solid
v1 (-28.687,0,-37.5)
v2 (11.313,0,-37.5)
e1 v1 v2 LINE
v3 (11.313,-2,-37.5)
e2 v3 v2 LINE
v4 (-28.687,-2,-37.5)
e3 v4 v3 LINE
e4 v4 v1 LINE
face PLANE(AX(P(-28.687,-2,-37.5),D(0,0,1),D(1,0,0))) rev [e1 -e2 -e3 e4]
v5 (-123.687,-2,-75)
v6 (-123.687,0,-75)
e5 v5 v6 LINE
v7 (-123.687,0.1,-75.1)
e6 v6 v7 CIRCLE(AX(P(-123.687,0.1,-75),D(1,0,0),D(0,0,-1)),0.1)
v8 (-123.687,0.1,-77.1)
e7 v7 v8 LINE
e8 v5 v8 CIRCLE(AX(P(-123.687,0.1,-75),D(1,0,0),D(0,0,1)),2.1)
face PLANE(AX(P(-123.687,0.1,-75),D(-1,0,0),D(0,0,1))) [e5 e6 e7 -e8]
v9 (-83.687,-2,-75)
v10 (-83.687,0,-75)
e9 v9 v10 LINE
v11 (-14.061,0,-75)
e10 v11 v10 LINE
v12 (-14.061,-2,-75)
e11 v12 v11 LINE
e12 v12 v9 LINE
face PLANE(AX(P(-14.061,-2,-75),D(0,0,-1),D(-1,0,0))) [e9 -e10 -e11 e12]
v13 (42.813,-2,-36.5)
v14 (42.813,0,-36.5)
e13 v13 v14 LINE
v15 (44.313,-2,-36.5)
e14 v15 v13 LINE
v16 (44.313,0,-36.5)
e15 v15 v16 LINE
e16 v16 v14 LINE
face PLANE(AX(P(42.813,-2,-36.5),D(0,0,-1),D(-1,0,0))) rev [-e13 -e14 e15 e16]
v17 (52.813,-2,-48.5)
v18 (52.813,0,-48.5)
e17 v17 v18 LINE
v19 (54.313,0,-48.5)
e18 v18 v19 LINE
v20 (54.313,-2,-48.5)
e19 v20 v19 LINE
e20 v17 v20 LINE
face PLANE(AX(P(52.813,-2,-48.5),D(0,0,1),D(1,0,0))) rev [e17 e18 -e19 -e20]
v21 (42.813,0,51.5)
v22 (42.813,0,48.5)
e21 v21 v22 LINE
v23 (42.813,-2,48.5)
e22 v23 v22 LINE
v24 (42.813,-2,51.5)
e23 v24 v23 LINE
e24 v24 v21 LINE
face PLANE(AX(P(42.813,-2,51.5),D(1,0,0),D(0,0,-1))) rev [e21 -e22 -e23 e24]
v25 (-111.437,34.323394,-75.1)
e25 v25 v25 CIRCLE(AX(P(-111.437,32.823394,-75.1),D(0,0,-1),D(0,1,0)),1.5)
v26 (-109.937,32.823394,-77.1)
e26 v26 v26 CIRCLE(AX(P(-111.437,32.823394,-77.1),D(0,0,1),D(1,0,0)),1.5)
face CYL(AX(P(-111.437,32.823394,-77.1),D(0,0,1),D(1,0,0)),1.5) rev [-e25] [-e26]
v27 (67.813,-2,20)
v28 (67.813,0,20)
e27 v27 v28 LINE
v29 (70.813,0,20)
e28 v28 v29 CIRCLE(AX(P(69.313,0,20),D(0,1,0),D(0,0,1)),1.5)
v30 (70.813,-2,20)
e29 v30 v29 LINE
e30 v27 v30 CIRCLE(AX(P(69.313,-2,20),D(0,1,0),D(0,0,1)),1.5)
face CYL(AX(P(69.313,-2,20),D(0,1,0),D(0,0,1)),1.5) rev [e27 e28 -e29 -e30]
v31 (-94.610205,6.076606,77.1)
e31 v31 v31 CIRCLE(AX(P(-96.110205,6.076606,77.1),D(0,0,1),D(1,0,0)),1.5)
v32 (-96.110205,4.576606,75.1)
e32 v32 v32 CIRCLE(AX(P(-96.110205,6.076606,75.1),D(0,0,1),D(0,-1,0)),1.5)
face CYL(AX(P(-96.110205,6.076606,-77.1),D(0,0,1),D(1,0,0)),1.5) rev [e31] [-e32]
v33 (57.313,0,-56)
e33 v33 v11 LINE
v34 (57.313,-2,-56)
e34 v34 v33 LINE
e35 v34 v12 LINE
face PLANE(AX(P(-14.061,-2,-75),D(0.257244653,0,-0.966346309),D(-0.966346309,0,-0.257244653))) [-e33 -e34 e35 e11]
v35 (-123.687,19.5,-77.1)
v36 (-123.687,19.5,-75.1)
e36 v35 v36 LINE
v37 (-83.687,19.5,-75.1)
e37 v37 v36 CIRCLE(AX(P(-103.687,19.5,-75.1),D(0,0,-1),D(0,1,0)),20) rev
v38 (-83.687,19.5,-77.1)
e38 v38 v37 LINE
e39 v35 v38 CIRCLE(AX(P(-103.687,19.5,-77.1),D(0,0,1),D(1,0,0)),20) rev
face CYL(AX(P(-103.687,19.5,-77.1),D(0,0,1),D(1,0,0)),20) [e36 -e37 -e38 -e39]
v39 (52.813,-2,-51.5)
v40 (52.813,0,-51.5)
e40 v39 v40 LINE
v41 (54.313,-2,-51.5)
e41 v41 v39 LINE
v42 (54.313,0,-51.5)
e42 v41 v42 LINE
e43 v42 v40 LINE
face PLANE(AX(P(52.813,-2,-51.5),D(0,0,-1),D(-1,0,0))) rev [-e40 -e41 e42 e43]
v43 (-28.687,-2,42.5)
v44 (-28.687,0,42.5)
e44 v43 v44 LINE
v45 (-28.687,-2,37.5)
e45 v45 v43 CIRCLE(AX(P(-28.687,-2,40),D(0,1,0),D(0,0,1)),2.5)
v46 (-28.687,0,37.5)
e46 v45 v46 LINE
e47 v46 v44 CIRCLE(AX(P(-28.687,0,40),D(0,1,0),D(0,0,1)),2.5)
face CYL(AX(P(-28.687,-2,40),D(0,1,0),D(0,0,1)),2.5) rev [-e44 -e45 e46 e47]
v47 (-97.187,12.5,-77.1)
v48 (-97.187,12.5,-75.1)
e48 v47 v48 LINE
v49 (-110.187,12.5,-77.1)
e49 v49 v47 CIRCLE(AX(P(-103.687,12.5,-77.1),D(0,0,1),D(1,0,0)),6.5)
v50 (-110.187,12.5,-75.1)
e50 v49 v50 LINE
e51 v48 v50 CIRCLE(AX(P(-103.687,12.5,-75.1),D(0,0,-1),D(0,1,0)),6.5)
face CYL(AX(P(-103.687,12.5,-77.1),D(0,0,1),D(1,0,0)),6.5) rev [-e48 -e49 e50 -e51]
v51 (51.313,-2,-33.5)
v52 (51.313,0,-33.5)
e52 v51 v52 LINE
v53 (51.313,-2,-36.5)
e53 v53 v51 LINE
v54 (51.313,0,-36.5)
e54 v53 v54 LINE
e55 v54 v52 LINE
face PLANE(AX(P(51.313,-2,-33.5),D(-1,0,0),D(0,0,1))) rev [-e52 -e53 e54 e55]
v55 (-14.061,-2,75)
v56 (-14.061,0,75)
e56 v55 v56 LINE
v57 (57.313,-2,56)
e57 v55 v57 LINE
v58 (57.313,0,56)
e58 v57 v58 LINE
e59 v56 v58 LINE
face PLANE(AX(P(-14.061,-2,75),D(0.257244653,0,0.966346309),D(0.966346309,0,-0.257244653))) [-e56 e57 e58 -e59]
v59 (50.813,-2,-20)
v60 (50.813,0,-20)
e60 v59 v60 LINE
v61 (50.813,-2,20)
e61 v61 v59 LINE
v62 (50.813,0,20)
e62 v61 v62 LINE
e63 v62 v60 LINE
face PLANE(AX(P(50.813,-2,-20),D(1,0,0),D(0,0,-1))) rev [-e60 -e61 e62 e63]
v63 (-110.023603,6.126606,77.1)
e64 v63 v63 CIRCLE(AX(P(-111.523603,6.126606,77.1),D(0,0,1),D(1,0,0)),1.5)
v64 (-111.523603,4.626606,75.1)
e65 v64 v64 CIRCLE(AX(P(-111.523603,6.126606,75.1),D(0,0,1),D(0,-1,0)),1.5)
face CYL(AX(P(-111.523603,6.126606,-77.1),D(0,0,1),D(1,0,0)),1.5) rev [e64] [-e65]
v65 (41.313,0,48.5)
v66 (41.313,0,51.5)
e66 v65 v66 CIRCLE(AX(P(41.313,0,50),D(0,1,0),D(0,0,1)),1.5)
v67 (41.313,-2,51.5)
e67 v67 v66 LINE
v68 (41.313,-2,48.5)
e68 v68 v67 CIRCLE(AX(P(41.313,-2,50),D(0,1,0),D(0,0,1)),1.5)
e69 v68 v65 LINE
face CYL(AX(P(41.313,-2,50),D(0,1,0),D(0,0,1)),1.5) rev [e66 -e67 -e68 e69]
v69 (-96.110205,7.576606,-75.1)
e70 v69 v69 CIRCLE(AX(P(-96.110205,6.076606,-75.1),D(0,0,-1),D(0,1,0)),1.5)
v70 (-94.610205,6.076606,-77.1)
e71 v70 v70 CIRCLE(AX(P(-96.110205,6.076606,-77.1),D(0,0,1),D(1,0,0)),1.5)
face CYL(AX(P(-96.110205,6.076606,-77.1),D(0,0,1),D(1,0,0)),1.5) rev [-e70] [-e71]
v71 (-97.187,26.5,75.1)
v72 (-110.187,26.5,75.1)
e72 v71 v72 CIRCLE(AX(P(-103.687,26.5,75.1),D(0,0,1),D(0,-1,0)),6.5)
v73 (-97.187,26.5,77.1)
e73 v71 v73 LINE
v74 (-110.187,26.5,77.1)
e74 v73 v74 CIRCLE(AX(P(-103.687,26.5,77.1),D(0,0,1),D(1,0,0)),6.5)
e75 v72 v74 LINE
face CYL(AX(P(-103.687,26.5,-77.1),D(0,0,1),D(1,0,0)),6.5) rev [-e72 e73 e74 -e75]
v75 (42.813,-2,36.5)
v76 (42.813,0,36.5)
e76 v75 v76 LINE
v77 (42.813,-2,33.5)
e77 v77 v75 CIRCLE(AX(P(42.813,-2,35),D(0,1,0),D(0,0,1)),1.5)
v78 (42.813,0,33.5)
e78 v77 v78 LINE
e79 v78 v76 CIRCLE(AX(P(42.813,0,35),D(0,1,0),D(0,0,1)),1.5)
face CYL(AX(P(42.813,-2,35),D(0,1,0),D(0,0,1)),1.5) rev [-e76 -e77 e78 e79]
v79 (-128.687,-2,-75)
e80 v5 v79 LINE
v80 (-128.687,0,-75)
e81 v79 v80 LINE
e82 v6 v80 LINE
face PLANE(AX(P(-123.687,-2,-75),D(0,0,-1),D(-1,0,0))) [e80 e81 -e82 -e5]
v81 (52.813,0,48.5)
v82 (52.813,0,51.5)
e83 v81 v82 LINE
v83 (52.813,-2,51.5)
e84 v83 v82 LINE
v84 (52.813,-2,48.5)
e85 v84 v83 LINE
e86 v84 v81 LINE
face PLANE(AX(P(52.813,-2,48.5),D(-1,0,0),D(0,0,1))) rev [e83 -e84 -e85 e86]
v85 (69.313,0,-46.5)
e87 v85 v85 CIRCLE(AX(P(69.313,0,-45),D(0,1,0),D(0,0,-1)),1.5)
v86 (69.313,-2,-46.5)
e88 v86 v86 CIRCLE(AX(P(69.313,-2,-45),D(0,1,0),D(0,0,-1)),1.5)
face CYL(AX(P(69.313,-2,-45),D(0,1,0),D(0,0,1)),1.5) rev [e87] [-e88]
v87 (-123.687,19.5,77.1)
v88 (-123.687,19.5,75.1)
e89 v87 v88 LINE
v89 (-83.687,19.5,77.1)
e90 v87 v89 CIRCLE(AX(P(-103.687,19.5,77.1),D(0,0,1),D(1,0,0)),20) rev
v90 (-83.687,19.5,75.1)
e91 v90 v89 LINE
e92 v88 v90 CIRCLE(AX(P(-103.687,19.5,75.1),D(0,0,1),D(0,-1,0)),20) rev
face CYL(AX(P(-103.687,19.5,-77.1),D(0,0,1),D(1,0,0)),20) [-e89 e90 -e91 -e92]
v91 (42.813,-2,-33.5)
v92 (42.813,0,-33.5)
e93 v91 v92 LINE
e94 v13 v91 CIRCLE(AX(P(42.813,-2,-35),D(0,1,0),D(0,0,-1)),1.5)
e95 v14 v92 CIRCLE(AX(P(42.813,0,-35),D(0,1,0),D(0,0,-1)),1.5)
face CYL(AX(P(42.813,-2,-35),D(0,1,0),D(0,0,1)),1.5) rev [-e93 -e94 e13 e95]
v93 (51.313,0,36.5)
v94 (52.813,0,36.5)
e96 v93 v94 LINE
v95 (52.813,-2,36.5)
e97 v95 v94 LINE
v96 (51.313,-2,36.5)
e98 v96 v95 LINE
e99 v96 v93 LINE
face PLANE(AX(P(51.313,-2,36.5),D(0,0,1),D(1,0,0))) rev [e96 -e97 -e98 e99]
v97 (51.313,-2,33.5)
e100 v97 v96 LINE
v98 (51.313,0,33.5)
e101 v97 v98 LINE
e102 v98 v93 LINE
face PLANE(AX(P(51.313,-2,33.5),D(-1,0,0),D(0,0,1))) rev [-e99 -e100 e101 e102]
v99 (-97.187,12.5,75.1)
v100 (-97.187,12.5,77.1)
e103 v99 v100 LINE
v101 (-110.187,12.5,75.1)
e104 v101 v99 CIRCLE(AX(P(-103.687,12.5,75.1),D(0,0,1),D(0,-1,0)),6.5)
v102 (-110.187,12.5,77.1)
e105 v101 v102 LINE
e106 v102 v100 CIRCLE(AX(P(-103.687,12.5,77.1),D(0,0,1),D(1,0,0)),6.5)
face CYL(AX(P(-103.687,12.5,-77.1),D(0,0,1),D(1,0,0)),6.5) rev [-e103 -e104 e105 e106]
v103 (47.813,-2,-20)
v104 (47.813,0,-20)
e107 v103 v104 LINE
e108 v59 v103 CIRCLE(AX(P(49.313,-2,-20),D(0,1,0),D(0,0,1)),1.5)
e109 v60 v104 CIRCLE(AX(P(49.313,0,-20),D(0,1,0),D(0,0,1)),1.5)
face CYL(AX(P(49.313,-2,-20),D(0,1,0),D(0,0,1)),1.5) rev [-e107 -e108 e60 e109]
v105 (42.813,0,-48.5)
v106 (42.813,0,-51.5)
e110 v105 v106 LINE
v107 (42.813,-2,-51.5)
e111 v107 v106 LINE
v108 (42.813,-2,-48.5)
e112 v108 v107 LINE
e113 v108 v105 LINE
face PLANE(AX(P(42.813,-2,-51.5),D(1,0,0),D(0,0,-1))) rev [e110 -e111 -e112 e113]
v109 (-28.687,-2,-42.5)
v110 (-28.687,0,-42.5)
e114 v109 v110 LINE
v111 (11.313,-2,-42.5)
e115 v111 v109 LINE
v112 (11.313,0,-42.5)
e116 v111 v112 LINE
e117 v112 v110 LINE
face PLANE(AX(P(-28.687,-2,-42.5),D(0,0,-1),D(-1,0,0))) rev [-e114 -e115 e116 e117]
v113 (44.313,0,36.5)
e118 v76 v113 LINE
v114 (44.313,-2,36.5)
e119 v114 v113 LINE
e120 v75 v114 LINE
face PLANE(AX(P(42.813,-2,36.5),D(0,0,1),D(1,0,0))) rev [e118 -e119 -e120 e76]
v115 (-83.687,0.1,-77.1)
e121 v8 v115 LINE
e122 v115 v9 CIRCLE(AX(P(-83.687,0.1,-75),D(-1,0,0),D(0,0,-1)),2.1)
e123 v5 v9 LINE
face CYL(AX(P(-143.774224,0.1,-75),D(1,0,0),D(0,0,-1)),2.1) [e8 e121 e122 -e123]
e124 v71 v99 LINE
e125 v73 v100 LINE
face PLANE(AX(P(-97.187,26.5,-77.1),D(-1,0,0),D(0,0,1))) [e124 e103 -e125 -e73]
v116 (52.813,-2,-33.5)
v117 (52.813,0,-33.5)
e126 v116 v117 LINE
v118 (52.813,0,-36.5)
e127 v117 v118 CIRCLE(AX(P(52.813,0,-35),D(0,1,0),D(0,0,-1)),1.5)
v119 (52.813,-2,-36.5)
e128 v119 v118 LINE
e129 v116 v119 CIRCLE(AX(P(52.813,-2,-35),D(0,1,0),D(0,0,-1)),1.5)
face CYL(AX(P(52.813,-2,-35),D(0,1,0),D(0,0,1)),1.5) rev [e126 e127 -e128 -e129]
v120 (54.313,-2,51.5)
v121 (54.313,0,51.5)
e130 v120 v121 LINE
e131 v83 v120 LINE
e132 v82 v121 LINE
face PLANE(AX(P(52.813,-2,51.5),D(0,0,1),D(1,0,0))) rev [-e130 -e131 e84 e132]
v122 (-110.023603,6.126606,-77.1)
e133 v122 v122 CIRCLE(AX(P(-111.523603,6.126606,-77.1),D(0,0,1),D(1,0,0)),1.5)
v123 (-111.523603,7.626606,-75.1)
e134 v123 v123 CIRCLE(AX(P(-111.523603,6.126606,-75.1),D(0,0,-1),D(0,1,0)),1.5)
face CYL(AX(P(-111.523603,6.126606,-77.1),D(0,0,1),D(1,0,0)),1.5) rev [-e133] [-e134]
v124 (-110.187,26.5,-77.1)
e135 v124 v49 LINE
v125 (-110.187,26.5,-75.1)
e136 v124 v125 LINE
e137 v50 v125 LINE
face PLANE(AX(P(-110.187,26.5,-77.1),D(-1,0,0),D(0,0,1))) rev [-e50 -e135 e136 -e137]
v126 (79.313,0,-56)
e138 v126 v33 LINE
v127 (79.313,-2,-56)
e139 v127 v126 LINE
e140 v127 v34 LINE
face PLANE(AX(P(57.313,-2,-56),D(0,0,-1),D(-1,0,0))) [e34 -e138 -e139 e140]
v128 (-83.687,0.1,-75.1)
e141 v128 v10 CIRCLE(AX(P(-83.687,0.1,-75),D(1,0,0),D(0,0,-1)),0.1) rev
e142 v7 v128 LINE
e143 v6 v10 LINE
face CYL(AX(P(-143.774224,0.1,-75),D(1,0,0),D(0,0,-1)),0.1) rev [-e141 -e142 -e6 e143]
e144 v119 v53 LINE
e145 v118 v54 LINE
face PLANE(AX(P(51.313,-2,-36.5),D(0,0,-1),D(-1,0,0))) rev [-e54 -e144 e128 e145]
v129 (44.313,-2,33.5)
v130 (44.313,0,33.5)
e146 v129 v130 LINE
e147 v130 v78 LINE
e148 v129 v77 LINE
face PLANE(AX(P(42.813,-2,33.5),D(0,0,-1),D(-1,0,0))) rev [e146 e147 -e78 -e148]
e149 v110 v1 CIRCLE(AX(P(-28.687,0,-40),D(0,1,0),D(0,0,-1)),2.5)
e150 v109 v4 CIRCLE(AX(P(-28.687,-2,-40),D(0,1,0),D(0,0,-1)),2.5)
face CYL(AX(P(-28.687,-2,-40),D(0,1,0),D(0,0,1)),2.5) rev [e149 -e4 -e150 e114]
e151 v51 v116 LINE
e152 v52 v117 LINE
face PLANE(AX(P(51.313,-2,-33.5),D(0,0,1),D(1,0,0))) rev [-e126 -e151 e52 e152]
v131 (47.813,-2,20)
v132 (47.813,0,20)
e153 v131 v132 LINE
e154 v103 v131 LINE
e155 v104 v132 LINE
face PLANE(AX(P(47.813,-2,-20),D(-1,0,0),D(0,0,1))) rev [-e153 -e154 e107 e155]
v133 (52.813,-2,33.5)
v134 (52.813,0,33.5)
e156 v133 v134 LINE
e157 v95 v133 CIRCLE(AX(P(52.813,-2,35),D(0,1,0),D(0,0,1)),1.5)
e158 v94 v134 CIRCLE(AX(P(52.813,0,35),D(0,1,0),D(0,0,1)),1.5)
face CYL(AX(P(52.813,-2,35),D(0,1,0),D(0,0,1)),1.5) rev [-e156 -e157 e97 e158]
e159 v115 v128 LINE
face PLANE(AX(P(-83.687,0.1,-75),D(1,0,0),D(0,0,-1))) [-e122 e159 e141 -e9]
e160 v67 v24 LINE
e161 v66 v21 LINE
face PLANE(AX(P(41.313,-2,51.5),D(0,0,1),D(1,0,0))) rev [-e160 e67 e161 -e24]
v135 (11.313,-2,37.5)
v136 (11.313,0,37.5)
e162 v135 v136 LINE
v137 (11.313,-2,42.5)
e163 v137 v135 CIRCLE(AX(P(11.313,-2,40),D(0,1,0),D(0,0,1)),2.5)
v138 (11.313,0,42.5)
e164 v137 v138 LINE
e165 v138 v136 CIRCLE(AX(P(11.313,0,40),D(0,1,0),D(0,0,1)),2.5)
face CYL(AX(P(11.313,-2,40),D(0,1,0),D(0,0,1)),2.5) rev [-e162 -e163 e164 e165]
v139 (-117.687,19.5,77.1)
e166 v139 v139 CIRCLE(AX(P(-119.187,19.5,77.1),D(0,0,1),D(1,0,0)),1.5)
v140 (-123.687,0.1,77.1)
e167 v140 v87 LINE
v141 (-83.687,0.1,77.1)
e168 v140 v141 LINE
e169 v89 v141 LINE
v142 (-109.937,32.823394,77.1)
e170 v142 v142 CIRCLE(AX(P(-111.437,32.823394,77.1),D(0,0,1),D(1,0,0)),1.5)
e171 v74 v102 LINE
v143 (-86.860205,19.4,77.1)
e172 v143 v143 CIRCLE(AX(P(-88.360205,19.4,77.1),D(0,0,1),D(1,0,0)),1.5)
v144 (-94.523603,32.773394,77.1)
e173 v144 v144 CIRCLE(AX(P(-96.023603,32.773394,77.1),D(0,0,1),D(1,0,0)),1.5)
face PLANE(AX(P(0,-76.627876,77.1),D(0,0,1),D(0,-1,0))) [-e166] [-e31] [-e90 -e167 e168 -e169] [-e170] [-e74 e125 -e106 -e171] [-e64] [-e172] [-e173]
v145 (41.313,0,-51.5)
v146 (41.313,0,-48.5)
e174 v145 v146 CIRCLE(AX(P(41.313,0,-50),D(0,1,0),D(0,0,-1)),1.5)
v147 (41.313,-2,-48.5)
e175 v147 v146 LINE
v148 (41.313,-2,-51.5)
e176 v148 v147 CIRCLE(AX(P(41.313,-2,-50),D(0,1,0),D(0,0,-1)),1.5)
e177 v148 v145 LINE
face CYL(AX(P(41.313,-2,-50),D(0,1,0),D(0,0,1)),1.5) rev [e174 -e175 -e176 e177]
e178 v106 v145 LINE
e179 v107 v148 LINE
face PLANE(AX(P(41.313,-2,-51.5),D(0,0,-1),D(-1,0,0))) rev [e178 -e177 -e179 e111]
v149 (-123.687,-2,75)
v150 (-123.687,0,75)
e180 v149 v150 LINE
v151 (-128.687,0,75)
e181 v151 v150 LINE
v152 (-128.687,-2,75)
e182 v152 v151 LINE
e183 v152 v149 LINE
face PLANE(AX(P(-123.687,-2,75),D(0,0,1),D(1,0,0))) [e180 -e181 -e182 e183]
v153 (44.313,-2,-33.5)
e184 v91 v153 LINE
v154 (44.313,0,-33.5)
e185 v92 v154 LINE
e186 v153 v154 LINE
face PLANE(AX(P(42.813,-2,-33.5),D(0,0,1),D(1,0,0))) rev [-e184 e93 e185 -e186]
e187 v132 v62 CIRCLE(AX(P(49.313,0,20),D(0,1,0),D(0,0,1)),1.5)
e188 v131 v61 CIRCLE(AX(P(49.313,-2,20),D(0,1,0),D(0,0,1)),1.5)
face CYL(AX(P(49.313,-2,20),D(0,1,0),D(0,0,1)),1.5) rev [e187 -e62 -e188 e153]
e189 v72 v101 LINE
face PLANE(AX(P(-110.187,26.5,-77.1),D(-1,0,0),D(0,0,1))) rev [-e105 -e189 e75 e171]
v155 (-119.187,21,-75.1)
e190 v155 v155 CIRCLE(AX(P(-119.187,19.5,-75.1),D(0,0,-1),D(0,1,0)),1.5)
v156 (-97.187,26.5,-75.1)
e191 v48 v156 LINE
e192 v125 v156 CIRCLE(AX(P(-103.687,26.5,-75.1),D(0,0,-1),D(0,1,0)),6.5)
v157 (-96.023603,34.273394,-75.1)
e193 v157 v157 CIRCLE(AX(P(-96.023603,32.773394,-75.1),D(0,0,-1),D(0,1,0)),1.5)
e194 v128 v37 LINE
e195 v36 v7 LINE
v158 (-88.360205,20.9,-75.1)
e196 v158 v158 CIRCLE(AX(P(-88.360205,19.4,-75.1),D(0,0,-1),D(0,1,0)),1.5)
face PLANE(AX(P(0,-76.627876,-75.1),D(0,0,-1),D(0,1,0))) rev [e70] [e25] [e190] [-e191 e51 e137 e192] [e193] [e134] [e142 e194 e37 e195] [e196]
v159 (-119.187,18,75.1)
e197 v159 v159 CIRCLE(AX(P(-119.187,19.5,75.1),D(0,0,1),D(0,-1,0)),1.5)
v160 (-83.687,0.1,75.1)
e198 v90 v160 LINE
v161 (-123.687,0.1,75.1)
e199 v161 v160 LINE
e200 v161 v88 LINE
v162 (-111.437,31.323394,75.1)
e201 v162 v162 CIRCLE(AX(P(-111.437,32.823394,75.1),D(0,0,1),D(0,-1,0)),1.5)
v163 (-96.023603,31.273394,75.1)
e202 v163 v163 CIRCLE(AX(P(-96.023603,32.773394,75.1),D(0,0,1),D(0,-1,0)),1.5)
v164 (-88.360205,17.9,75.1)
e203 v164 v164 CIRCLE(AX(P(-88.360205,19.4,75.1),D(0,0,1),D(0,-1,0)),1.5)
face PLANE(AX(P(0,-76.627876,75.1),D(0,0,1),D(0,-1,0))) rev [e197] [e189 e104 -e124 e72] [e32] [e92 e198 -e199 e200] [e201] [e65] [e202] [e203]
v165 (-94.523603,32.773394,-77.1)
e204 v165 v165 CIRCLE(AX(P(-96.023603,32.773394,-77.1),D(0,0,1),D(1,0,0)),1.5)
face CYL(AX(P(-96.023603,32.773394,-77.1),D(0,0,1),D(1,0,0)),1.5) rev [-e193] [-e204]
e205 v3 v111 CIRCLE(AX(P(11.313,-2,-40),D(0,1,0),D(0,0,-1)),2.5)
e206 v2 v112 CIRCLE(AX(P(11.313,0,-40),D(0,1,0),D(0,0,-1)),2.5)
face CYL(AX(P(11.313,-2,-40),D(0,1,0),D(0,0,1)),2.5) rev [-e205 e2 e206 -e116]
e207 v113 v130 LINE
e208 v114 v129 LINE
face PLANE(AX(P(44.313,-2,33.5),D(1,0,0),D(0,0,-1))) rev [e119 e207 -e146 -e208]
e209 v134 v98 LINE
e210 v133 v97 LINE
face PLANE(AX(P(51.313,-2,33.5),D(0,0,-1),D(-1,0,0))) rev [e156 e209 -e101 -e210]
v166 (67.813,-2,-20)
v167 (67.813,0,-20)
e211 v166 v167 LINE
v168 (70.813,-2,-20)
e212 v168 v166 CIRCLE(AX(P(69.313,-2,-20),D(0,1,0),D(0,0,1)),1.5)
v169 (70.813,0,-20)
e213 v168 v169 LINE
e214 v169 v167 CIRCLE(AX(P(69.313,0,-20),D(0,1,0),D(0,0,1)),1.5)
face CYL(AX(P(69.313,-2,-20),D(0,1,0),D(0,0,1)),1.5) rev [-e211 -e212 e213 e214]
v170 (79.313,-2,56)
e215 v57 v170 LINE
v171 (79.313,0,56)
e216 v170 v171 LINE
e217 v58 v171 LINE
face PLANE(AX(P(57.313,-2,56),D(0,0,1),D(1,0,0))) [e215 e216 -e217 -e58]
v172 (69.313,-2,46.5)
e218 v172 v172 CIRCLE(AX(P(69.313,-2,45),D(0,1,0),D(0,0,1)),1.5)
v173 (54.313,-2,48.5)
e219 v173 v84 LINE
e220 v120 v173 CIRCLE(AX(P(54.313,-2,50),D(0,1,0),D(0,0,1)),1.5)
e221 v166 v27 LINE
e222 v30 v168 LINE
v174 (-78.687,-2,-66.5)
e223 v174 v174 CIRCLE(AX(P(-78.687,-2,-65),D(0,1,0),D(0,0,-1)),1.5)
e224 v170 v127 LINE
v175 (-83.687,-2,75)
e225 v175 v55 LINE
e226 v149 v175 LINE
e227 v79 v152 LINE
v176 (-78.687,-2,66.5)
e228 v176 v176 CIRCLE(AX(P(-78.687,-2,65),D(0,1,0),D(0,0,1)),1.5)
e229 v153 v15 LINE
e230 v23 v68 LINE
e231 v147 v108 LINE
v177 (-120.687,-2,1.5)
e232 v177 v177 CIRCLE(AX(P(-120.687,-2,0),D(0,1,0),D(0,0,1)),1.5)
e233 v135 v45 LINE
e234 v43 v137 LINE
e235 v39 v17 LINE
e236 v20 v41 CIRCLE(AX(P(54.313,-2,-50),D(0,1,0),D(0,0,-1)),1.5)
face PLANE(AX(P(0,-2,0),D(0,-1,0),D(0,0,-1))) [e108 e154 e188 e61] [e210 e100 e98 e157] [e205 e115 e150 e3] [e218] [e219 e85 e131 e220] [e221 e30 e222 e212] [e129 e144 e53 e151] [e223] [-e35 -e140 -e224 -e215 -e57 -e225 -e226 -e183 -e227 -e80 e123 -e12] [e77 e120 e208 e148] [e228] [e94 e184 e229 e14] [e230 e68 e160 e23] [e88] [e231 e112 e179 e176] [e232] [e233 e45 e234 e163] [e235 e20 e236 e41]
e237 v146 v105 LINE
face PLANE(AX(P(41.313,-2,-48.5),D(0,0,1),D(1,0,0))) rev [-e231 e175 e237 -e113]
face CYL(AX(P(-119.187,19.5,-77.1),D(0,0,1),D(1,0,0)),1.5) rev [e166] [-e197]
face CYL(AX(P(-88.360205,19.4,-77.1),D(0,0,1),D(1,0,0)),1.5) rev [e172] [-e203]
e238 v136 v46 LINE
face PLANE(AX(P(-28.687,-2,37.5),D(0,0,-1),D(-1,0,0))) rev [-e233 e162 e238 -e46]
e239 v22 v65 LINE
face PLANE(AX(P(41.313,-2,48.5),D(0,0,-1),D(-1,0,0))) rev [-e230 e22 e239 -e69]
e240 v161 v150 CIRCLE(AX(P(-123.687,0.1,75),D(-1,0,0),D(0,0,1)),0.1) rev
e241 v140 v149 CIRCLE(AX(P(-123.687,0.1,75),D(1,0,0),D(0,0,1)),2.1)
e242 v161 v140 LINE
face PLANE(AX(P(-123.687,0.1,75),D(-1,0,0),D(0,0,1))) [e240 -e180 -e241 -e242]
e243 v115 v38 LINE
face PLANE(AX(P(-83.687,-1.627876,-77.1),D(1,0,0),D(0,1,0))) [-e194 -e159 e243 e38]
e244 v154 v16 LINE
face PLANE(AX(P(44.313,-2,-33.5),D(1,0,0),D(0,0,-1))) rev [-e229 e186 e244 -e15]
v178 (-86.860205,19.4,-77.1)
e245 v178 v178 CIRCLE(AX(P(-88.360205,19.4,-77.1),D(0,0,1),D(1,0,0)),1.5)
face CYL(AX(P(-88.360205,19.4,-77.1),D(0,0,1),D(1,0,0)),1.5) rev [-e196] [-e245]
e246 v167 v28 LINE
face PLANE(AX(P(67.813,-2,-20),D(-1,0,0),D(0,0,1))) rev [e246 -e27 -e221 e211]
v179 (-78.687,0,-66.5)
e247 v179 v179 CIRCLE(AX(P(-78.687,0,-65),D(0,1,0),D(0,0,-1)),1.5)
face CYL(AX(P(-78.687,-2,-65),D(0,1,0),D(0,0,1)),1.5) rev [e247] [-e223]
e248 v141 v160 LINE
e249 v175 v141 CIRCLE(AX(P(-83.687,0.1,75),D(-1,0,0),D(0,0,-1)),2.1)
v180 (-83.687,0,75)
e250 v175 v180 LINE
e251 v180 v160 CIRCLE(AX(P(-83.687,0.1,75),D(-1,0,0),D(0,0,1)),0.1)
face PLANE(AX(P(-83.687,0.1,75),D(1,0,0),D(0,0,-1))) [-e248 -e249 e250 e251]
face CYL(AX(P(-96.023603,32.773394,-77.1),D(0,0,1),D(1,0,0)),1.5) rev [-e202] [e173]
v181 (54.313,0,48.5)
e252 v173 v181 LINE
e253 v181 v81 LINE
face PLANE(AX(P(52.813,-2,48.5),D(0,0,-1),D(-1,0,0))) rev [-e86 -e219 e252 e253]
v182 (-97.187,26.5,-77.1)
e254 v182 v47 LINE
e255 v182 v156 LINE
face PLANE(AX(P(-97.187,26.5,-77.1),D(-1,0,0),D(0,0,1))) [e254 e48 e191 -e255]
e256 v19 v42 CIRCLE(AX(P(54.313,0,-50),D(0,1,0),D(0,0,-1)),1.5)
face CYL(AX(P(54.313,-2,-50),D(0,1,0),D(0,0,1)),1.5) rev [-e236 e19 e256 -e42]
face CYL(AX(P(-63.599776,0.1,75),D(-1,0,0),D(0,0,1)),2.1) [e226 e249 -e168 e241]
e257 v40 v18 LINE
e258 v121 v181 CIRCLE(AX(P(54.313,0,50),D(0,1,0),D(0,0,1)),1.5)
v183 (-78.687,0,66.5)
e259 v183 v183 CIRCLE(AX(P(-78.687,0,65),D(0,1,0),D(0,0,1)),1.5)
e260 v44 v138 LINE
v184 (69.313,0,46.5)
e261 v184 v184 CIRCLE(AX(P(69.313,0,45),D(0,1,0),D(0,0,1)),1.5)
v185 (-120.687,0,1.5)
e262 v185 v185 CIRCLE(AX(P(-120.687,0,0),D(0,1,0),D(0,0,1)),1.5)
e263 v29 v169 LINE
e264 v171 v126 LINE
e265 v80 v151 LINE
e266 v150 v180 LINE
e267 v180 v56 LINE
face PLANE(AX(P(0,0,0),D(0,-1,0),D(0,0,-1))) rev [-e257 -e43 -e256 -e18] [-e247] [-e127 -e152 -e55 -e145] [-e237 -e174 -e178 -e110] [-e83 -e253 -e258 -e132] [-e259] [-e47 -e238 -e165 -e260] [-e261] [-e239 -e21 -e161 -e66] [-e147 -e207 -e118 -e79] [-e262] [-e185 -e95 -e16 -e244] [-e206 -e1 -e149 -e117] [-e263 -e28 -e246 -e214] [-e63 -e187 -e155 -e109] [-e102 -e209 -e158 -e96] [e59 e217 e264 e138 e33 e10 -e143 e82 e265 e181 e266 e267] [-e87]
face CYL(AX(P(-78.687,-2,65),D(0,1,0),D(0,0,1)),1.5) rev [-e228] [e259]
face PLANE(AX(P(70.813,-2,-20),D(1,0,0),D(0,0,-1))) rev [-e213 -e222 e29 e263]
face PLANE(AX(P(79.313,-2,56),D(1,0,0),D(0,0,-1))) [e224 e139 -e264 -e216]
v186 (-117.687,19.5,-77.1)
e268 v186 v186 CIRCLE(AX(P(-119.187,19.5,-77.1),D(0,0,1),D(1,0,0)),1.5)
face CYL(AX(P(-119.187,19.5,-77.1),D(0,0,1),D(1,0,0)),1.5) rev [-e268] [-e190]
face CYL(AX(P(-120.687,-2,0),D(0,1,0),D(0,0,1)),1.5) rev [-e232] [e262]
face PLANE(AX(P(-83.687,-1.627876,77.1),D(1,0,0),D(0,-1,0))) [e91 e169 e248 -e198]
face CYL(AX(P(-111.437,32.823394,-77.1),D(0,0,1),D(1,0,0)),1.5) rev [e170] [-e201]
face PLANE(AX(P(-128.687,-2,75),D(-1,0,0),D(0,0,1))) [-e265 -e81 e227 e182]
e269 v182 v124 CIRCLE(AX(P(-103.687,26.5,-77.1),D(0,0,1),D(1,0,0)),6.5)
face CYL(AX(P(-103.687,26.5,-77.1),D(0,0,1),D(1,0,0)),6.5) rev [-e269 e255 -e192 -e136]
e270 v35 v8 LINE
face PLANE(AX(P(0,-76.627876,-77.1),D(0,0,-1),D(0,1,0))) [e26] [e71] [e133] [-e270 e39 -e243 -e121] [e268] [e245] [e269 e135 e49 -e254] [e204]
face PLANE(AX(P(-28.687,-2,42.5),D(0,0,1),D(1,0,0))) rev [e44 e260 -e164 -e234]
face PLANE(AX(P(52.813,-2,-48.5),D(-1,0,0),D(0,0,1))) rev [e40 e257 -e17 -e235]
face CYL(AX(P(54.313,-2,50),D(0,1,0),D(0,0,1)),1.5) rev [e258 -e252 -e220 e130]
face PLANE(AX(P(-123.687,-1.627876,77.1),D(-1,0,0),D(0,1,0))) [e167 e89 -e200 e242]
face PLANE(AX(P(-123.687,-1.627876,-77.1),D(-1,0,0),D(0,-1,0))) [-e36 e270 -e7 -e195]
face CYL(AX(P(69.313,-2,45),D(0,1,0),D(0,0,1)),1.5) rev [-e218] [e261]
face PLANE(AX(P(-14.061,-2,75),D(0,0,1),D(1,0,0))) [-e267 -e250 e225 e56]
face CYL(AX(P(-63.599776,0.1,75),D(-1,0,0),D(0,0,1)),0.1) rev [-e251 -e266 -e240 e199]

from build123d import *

# Parameters (mm, degrees)
BRIDA_BASE1_DEPTH           = 2
CROQUIS5_R                  = 1.5
CORTAR_EXTRUIR1_DEPTH       = 10
PLIEGUE_START               = -123.687
PLIEGUE_CROQUIZADO1_DEPTH   = 40
PLIEGUE_CROQUIZADO1_2_DEPTH = 40
CROQUIS7_R                  = 1.5
CORTAR_EXTRUIR2_DEPTH       = 206.264173359


# Read off the part's stored shape, not the designer's step: Pliegue croquizado1
# Sheet-metal steps are written as plain solids
with BuildPart() as part:
    # Croquis base → Brida base1 (new body)
    with BuildSketch(Plane(origin=(0, 0, 0), x_dir=(1, 0, 0), z_dir=(0, 1, 0))):
        Polygon((-14.061, -75), (-83.687, -75), (-83.687, -119), (-123.687, -119), (-123.687, -75), (-128.687, -75), (-128.687, 75), (-123.687, 75), (-123.687, 119), (-83.687, 119), (-83.687, 75), (-14.061, 75), (57.313, 56), (79.313, 56), (79.313, -56), (57.313, -56), align=None)
    extrude(amount=-BRIDA_BASE1_DEPTH)

    # Croquis5 → Cortar-Extruir1 (cut)
    with BuildSketch(Plane(origin=(0, 0, 0), x_dir=(1, 0, 0), z_dir=(0, 1, 0))):
        with Locations(Location((-78.687, -65, 0), (0, 0, 270))):
            Circle(CROQUIS5_R)
        with Locations(Location((69.313, -45, 0), (0, 0, 270))):
            Circle(CROQUIS5_R)
        with Locations(Location((69.313, 45, 0), (0, 0, 90))):
            Circle(CROQUIS5_R)
        with Locations(Location((-78.687, 65, 0), (0, 0, 90))):
            Circle(CROQUIS5_R)
        with Locations(Location((-120.687, 0, 0), (0, 0, 270))):
            Circle(CROQUIS5_R)
        with BuildLine():
            Line((-28.687, -37.5), (11.313, -37.5))
            ThreePointArc((11.313, -37.5), (13.813, -40), (11.313, -42.5))
            Line((11.313, -42.5), (-28.687, -42.5))
            ThreePointArc((-28.687, -42.5), (-31.187, -40), (-28.687, -37.5))
        make_face()
        with BuildLine():
            Line((41.313, -51.5), (42.813, -51.5))
            Line((42.813, -51.5), (42.813, -48.5))
            Line((42.813, -48.5), (41.313, -48.5))
            ThreePointArc((41.313, -48.5), (39.813, -50), (41.313, -51.5))
        make_face()
        with BuildLine():
            Line((51.313, 36.5), (52.813, 36.5))
            ThreePointArc((52.813, 36.5), (54.313, 35), (52.813, 33.5))
            Line((52.813, 33.5), (51.313, 33.5))
            Line((51.313, 33.5), (51.313, 36.5))
        make_face()
        with BuildLine():
            Line((52.813, -48.5), (54.313, -48.5))
            ThreePointArc((54.313, -48.5), (55.813, -50), (54.313, -51.5))
            Line((54.313, -51.5), (52.813, -51.5))
            Line((52.813, -51.5), (52.813, -48.5))
        make_face()
        with BuildLine():
            Line((42.813, -33.5), (44.313, -33.5))
            Line((44.313, -33.5), (44.313, -36.5))
            Line((44.313, -36.5), (42.813, -36.5))
            ThreePointArc((42.813, -36.5), (41.313, -35), (42.813, -33.5))
        make_face()
        with BuildLine():
            Line((51.313, -33.5), (52.813, -33.5))
            ThreePointArc((52.813, -33.5), (54.313, -35), (52.813, -36.5))
            Line((52.813, -36.5), (51.313, -36.5))
            Line((51.313, -36.5), (51.313, -33.5))
        make_face()
        with BuildLine():
            Line((44.313, 33.5), (44.313, 36.5))
            Line((44.313, 36.5), (42.813, 36.5))
            ThreePointArc((42.813, 36.5), (41.313, 35), (42.813, 33.5))
            Line((42.813, 33.5), (44.313, 33.5))
        make_face()
        with BuildLine():
            Line((52.813, 51.5), (54.313, 51.5))
            ThreePointArc((54.313, 51.5), (55.813, 50), (54.313, 48.5))
            Line((54.313, 48.5), (52.813, 48.5))
            Line((52.813, 48.5), (52.813, 51.5))
        make_face()
        with BuildLine():
            Line((42.813, 51.5), (42.813, 48.5))
            Line((42.813, 48.5), (41.313, 48.5))
            ThreePointArc((41.313, 48.5), (39.813, 50), (41.313, 51.5))
            Line((41.313, 51.5), (42.813, 51.5))
        make_face()
        with BuildLine():
            Line((-28.687, 37.5), (11.313, 37.5))
            ThreePointArc((11.313, 37.5), (13.813, 40), (11.313, 42.5))
            Line((11.313, 42.5), (-28.687, 42.5))
            ThreePointArc((-28.687, 42.5), (-31.187, 40), (-28.687, 37.5))
        make_face()
        with BuildLine():
            Line((47.813, 20), (47.813, -20))
            ThreePointArc((47.813, -20), (49.313, -21.5), (50.813, -20))
            Line((50.813, -20), (50.813, 20))
            ThreePointArc((50.813, 20), (49.313, 21.5), (47.813, 20))
        make_face()
        with BuildLine():
            Line((67.813, 20), (67.813, -20))
            ThreePointArc((67.813, -20), (69.313, -21.5), (70.813, -20))
            Line((70.813, -20), (70.813, 20))
            ThreePointArc((70.813, 20), (69.313, 21.5), (67.813, 20))
        make_face()
    extrude(amount=-CORTAR_EXTRUIR1_DEPTH, mode=Mode.SUBTRACT)

    # Pliegue croquizado1 outline → Pliegue croquizado1 (cut)
    with BuildSketch(Plane.YZ.offset(PLIEGUE_START)):
        with BuildLine():
            ThreePointArc((0, -77.097617696), (-1.419868415, -76.449137674), (-2, -75))
            Line((-2, -75), (-2, -119))
            Line((-2, -119), (0, -119))
            Line((0, -119), (0, -77.097617696))
        make_face()
        with BuildLine():
            Line((-2, 119), (-2, 75))
            ThreePointArc((-2, 75), (-1.419868415, 76.449137674), (0, 77.097617696))
            Line((0, 77.097617696), (0, 119))
            Line((0, 119), (-2, 119))
        make_face()
    extrude(amount=PLIEGUE_CROQUIZADO1_DEPTH, mode=Mode.SUBTRACT)

    # Pliegue croquizado1 2 outline → Pliegue croquizado1 2 (add)
    with BuildSketch(Plane.YZ.offset(PLIEGUE_START)):
        with BuildLine():
            Line((0, -75), (0, -77.097617696))
            ThreePointArc((0, -77.097617696), (0.049985814, -77.09940434), (0.1, -77.1))
            Line((0.1, -77.1), (42.372124041, -77.1))
            Line((42.372124041, -77.1), (42.372124041, -75.1))
            Line((42.372124041, -75.1), (0.1, -75.1))
            ThreePointArc((0.1, -75.1), (0.029289322, -75.070710678), (0, -75))
        make_face()
        with BuildLine():
            ThreePointArc((0.1, 77.1), (0.049985814, 77.09940434), (0, 77.097617696))
            Line((0, 77.097617696), (0, 75))
            ThreePointArc((0, 75), (0.029289322, 75.070710678), (0.1, 75.1))
            Line((0.1, 75.1), (42.372124041, 75.1))
            Line((42.372124041, 75.1), (42.372124041, 77.1))
            Line((42.372124041, 77.1), (0.1, 77.1))
        make_face()
    extrude(amount=PLIEGUE_CROQUIZADO1_2_DEPTH)

    # Croquis7 → Cortar-Extruir2 (cut, through all)
    with BuildSketch(Plane.XY.offset(77.1)):
        with BuildLine():
            Line((-103.687, 39.5), (-103.687, 42.372124041))
            Line((-103.687, 42.372124041), (-123.687, 42.372124041))
            Line((-123.687, 42.372124041), (-123.687, 19.5))
            ThreePointArc((-123.687, 19.5), (-117.829135624, 33.642135624), (-103.687, 39.5))
        make_face()
        with BuildLine():
            Line((-83.687, 42.372124041), (-103.687, 42.372124041))
            Line((-103.687, 42.372124041), (-103.687, 39.5))
            ThreePointArc((-103.687, 39.5), (-89.544864376, 33.642135624), (-83.687, 19.5))
            Line((-83.687, 19.5), (-83.687, 42.372124041))
        make_face()
        with BuildLine():
            Line((-110.187, 26.5), (-110.187, 12.5))
            ThreePointArc((-110.187, 12.5), (-103.687, 6), (-97.187, 12.5))
            Line((-97.187, 12.5), (-97.187, 26.5))
            ThreePointArc((-97.187, 26.5), (-103.687, 33), (-110.187, 26.5))
        make_face()
        with Locations((-119.187, 19.5)):
            Circle(CROQUIS7_R)
        with Locations((-111.437, 32.823393759)):
            Circle(CROQUIS7_R)
        with Locations((-96.02360254, 32.773393759)):
            Circle(CROQUIS7_R)
        with Locations((-88.360205081, 19.4)):
            Circle(CROQUIS7_R)
        with Locations((-96.110205081, 6.076606241)):
            Circle(CROQUIS7_R)
        with Locations((-111.52360254, 6.126606241)):
            Circle(CROQUIS7_R)
    extrude(amount=-CORTAR_EXTRUIR2_DEPTH, mode=Mode.SUBTRACT)


solid = part.part
